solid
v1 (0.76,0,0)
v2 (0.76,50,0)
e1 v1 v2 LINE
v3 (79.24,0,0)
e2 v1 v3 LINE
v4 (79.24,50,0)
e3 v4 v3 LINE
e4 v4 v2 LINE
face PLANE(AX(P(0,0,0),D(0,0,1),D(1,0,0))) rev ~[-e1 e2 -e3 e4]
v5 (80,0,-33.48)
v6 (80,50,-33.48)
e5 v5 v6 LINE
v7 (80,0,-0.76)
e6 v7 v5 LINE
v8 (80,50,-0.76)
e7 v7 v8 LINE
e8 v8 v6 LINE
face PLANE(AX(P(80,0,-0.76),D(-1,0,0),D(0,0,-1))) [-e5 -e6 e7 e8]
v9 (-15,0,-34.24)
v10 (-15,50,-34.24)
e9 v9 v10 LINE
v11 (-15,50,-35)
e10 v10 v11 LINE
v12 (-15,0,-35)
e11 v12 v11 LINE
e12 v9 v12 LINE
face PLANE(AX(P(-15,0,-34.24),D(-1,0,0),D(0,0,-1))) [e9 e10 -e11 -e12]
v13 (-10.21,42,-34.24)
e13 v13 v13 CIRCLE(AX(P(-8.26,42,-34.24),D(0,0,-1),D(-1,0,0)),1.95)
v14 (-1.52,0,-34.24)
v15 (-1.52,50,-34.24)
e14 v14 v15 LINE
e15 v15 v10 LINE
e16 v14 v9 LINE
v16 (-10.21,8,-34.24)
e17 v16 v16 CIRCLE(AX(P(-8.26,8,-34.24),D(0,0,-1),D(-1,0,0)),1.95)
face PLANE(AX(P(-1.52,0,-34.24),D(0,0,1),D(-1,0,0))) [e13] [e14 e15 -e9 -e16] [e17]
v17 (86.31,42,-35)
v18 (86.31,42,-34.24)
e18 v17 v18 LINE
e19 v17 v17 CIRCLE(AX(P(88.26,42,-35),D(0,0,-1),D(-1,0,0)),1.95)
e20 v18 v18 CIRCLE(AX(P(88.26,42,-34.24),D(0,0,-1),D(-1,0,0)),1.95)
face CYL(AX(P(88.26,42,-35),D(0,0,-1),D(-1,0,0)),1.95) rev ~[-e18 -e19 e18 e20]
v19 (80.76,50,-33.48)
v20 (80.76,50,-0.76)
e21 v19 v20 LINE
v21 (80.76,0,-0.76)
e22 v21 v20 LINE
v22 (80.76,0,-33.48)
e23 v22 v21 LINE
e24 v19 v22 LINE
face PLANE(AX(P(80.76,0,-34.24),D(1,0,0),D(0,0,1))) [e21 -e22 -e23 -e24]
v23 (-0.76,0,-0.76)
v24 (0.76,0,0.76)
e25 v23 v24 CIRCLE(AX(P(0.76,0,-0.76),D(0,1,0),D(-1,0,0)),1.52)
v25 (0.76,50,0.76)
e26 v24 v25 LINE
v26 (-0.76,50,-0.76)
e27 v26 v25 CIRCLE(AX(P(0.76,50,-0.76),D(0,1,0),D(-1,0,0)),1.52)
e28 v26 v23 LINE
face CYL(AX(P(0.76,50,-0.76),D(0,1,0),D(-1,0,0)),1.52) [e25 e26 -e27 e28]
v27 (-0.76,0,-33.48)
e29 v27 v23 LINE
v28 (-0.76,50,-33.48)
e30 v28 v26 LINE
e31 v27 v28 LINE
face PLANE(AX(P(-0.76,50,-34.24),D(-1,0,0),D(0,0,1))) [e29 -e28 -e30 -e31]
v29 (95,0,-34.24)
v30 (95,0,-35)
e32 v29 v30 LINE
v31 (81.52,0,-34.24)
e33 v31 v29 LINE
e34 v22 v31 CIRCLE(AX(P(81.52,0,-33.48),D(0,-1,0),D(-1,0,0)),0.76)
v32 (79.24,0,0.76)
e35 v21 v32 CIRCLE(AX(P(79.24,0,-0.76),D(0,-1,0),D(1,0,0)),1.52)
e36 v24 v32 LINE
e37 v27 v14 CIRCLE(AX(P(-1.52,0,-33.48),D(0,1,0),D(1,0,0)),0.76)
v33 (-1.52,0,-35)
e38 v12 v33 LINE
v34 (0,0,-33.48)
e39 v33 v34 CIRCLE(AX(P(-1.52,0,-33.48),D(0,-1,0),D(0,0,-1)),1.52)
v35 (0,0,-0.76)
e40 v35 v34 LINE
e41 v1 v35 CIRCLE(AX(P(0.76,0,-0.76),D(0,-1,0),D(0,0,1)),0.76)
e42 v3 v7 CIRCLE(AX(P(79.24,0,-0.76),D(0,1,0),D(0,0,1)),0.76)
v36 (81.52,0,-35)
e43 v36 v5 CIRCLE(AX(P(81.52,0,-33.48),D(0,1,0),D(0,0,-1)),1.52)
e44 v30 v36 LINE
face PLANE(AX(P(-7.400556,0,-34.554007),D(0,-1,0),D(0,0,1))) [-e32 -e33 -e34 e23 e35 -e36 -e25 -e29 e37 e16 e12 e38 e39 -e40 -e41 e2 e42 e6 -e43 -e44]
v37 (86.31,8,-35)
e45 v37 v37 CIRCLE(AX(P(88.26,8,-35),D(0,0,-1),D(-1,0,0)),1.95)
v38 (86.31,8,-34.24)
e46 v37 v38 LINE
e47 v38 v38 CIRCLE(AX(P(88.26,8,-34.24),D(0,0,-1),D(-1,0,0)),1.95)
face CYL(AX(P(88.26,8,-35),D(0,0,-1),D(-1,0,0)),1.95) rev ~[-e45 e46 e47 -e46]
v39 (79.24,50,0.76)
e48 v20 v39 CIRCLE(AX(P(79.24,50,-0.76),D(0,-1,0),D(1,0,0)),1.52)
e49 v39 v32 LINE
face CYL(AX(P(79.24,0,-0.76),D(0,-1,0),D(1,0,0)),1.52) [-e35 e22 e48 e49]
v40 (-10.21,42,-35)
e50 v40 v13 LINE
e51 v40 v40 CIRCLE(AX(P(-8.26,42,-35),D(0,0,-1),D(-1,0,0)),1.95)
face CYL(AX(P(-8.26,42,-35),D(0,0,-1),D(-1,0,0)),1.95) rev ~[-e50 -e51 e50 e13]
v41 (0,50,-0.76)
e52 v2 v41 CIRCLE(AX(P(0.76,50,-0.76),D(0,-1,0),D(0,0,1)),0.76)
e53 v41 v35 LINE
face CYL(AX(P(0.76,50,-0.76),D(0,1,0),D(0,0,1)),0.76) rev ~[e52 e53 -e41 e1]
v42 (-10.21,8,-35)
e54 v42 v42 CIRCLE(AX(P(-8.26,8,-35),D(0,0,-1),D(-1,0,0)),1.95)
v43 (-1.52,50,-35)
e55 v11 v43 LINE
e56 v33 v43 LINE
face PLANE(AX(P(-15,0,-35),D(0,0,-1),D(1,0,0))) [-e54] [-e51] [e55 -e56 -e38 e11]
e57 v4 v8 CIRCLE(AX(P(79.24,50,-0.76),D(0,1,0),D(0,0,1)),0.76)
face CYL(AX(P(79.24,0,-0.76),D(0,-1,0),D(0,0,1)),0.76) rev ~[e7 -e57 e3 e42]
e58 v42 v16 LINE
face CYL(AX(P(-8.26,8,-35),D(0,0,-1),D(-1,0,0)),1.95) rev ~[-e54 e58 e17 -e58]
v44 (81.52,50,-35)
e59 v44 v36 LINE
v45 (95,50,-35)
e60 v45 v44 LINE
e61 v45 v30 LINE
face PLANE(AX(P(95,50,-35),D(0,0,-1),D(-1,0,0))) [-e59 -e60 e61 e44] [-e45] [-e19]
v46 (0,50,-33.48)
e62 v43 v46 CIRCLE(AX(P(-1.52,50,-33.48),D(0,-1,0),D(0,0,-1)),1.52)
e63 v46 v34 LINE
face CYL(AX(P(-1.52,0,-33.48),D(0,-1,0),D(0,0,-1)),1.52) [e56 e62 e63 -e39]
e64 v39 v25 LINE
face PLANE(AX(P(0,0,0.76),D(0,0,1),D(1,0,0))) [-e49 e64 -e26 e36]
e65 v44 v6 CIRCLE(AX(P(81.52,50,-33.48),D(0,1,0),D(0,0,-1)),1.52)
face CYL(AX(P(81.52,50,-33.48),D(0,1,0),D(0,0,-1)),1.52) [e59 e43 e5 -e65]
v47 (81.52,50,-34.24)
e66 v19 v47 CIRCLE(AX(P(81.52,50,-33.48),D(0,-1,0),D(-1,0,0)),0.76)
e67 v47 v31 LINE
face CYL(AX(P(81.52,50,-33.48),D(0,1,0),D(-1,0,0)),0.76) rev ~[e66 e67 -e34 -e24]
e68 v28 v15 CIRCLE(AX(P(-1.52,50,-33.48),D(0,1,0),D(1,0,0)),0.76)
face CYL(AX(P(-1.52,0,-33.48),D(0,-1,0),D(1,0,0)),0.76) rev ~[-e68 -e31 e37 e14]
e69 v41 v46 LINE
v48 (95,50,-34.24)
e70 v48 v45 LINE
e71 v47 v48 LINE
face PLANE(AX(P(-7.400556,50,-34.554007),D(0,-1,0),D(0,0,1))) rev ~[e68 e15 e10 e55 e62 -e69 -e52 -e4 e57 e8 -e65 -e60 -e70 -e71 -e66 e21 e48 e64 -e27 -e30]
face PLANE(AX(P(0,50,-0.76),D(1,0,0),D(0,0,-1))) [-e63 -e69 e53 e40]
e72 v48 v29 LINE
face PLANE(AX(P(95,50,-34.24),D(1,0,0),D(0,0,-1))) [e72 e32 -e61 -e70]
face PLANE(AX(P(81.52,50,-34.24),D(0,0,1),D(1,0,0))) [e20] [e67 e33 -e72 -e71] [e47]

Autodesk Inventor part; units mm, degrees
ref_plane "YZ Plane" through (0, 0, 0) normal (1, 0, 0) x (0, 1, 0)
ref_plane "XZ Plane" through (0, 0, 0) normal (0, 1, 0) x (-1, 0, 0)
ref_plane "XY Plane" through (0, 0, 0) normal (0, 0, 1) x (1, 0, 0)
sketch "Boceto1" plane through (0, 0, 0) normal (0, 0, 1) x (1, 0, 0)
  line L0 (0, 0) -> (80, 0)
  line L1 (80, 0) -> (80, 50)
  line L2 (80, 50) -> (0, 50)
  line L3 (0, 50) -> (0, 0)
  dimension "d0" = 80
  dimension "d1" = 50
extrude "Placa1" add sketch "Boceto1" along normal blind 0.76
sketch "Boceto2" plane through (80, 50, 0) normal (1, 0, 0) x (0, 1, 0)
  line L0 (-50, 0) -> (0, 0)
  line L1 (0, 0) -> (0, 34.24)
  line L2 (0, 34.24) -> (-50, 34.24)
  line L3 (-50, 34.24) -> (-50, 0)
edge flange "Pestaña1" height 35 angle 90 thickness 0.76 bend radius 0.76 thickness toward (1, 0, 0) relief tear relief width 0.76 relief depth 0.38 corner gap 0.76 corner form 0 edges at (80, 25, 0.76) (0, 25, 0.76) wall of the first edge with corners at (80, 0, 0) (80, 50, 0) (80, 50, -34.24) (80, 0, -34.24)
bend "Doblez1"
corner "Esquina1"
sketch "Boceto3" plane through (-0.76, 50, -34.24) normal (0, 0, -1) x (1, 0, 0)
  line L0 (0, -50) -> (0, 0)
  line L1 (0, 0) -> (-14.24, 0)
  line L2 (-14.24, 0) -> (-14.24, -50)
  line L3 (-14.24, -50) -> (0, -50)
edge flange "Pestaña2" height 15 angle 90 thickness 0.76 bend radius 0.76 thickness toward (0, 0, -1) relief tear relief width 0.76 relief depth 0.38 corner gap 0.76 corner form 0 edges at (0, 25, -34.24) (80, 25, -34.24) wall of the first edge with corners at (-0.76, 0, -34.24) (-0.76, 50, -34.24) (-15, 50, -34.24) (-15, 0, -34.24)
bend "Doblez2"
corner "Esquina2"
sketch "Boceto4" plane through (-15, 0, -35) normal (0, 0, -1) x (-1, 0, 0)
  circle A0 centre (-6.74, 8) radius 1.95
  circle A1 centre (-6.74, 42) radius 1.95
  point P0 (-15, 0)
  dimension "d23" = 3.9
  dimension "d24" = 3.9
extrude "Extrusión1" cut sketch "Boceto4" against normal through all
sketch "Boceto5" plane through (95, 0, -35) normal (0, 0, -1) x (-1, 0, 0)
  circle A0 centre (6.74, 8) radius 1.95
  circle A1 centre (6.74, 42) radius 1.95
  point P0 (95, 0)
  dimension "d27" = 3.9
  dimension "d28" = 3.9
extrude "Extrusión2" cut sketch "Boceto5" against normal through all
sketch "Boceto6" plane through (0, 0, 0.76) normal (0, 0, 1) x (1, 0, 0)
  point P0 (0, 0)
equation "\"d24\" = d23"
equation "\"d28\" = d27"
equation "\"d2\" = Grosor"
equation "\"d3\" = Anchura_desahogo_plegado"
equation "\"d4\" = Profundidad_desahogo_plegado"
equation "\"d5\" = Remanente_mínimo"
equation "\"d6\" = Radiodetransición"
equation "\"d9\" = Radio_pliegue"
equation "\"d10\" = Tamaño_destalonado"
equation "\"d11\" = TamañoSeparación"
equation "\"d12\" = Tamaño_de_radio_de_Jacobi"
equation "\"d13\" = Anchura_desahogo_plegado"
equation "\"d14\" = Profundidad_desahogo_plegado"
equation "\"d15\" = Remanente_mínimo"
equation "\"d16\" = Radiodetransición"
equation "\"d19\" = Radio_pliegue"
equation "\"d20\" = Tamaño_destalonado"
equation "\"d21\" = TamañoSeparación"
equation "\"d22\" = Tamaño_de_radio_de_Jacobi"
equation "\"Radio_pliegue\" = Grosor"
equation "\"Anchura_desahogo_plegado\" = Grosor"
equation "\"Profundidad_desahogo_plegado\" = 0.5 * Grosor"
equation "\"Tamaño_destalonado\" = 4 * Grosor"
equation "\"Remanente_mínimo\" = 2 * Grosor"
equation "\"Radiodetransición\" = Radio_pliegue"
equation "\"Tamaño_de_radio_de_Jacobi\" = Radio_pliegue"
equation "\"TamañoSeparación\" = Grosor"
equation "\"Grosor\" = 0.76"
properties part number "Base Valvula" material "Steel AISI 1006 85 HR"
